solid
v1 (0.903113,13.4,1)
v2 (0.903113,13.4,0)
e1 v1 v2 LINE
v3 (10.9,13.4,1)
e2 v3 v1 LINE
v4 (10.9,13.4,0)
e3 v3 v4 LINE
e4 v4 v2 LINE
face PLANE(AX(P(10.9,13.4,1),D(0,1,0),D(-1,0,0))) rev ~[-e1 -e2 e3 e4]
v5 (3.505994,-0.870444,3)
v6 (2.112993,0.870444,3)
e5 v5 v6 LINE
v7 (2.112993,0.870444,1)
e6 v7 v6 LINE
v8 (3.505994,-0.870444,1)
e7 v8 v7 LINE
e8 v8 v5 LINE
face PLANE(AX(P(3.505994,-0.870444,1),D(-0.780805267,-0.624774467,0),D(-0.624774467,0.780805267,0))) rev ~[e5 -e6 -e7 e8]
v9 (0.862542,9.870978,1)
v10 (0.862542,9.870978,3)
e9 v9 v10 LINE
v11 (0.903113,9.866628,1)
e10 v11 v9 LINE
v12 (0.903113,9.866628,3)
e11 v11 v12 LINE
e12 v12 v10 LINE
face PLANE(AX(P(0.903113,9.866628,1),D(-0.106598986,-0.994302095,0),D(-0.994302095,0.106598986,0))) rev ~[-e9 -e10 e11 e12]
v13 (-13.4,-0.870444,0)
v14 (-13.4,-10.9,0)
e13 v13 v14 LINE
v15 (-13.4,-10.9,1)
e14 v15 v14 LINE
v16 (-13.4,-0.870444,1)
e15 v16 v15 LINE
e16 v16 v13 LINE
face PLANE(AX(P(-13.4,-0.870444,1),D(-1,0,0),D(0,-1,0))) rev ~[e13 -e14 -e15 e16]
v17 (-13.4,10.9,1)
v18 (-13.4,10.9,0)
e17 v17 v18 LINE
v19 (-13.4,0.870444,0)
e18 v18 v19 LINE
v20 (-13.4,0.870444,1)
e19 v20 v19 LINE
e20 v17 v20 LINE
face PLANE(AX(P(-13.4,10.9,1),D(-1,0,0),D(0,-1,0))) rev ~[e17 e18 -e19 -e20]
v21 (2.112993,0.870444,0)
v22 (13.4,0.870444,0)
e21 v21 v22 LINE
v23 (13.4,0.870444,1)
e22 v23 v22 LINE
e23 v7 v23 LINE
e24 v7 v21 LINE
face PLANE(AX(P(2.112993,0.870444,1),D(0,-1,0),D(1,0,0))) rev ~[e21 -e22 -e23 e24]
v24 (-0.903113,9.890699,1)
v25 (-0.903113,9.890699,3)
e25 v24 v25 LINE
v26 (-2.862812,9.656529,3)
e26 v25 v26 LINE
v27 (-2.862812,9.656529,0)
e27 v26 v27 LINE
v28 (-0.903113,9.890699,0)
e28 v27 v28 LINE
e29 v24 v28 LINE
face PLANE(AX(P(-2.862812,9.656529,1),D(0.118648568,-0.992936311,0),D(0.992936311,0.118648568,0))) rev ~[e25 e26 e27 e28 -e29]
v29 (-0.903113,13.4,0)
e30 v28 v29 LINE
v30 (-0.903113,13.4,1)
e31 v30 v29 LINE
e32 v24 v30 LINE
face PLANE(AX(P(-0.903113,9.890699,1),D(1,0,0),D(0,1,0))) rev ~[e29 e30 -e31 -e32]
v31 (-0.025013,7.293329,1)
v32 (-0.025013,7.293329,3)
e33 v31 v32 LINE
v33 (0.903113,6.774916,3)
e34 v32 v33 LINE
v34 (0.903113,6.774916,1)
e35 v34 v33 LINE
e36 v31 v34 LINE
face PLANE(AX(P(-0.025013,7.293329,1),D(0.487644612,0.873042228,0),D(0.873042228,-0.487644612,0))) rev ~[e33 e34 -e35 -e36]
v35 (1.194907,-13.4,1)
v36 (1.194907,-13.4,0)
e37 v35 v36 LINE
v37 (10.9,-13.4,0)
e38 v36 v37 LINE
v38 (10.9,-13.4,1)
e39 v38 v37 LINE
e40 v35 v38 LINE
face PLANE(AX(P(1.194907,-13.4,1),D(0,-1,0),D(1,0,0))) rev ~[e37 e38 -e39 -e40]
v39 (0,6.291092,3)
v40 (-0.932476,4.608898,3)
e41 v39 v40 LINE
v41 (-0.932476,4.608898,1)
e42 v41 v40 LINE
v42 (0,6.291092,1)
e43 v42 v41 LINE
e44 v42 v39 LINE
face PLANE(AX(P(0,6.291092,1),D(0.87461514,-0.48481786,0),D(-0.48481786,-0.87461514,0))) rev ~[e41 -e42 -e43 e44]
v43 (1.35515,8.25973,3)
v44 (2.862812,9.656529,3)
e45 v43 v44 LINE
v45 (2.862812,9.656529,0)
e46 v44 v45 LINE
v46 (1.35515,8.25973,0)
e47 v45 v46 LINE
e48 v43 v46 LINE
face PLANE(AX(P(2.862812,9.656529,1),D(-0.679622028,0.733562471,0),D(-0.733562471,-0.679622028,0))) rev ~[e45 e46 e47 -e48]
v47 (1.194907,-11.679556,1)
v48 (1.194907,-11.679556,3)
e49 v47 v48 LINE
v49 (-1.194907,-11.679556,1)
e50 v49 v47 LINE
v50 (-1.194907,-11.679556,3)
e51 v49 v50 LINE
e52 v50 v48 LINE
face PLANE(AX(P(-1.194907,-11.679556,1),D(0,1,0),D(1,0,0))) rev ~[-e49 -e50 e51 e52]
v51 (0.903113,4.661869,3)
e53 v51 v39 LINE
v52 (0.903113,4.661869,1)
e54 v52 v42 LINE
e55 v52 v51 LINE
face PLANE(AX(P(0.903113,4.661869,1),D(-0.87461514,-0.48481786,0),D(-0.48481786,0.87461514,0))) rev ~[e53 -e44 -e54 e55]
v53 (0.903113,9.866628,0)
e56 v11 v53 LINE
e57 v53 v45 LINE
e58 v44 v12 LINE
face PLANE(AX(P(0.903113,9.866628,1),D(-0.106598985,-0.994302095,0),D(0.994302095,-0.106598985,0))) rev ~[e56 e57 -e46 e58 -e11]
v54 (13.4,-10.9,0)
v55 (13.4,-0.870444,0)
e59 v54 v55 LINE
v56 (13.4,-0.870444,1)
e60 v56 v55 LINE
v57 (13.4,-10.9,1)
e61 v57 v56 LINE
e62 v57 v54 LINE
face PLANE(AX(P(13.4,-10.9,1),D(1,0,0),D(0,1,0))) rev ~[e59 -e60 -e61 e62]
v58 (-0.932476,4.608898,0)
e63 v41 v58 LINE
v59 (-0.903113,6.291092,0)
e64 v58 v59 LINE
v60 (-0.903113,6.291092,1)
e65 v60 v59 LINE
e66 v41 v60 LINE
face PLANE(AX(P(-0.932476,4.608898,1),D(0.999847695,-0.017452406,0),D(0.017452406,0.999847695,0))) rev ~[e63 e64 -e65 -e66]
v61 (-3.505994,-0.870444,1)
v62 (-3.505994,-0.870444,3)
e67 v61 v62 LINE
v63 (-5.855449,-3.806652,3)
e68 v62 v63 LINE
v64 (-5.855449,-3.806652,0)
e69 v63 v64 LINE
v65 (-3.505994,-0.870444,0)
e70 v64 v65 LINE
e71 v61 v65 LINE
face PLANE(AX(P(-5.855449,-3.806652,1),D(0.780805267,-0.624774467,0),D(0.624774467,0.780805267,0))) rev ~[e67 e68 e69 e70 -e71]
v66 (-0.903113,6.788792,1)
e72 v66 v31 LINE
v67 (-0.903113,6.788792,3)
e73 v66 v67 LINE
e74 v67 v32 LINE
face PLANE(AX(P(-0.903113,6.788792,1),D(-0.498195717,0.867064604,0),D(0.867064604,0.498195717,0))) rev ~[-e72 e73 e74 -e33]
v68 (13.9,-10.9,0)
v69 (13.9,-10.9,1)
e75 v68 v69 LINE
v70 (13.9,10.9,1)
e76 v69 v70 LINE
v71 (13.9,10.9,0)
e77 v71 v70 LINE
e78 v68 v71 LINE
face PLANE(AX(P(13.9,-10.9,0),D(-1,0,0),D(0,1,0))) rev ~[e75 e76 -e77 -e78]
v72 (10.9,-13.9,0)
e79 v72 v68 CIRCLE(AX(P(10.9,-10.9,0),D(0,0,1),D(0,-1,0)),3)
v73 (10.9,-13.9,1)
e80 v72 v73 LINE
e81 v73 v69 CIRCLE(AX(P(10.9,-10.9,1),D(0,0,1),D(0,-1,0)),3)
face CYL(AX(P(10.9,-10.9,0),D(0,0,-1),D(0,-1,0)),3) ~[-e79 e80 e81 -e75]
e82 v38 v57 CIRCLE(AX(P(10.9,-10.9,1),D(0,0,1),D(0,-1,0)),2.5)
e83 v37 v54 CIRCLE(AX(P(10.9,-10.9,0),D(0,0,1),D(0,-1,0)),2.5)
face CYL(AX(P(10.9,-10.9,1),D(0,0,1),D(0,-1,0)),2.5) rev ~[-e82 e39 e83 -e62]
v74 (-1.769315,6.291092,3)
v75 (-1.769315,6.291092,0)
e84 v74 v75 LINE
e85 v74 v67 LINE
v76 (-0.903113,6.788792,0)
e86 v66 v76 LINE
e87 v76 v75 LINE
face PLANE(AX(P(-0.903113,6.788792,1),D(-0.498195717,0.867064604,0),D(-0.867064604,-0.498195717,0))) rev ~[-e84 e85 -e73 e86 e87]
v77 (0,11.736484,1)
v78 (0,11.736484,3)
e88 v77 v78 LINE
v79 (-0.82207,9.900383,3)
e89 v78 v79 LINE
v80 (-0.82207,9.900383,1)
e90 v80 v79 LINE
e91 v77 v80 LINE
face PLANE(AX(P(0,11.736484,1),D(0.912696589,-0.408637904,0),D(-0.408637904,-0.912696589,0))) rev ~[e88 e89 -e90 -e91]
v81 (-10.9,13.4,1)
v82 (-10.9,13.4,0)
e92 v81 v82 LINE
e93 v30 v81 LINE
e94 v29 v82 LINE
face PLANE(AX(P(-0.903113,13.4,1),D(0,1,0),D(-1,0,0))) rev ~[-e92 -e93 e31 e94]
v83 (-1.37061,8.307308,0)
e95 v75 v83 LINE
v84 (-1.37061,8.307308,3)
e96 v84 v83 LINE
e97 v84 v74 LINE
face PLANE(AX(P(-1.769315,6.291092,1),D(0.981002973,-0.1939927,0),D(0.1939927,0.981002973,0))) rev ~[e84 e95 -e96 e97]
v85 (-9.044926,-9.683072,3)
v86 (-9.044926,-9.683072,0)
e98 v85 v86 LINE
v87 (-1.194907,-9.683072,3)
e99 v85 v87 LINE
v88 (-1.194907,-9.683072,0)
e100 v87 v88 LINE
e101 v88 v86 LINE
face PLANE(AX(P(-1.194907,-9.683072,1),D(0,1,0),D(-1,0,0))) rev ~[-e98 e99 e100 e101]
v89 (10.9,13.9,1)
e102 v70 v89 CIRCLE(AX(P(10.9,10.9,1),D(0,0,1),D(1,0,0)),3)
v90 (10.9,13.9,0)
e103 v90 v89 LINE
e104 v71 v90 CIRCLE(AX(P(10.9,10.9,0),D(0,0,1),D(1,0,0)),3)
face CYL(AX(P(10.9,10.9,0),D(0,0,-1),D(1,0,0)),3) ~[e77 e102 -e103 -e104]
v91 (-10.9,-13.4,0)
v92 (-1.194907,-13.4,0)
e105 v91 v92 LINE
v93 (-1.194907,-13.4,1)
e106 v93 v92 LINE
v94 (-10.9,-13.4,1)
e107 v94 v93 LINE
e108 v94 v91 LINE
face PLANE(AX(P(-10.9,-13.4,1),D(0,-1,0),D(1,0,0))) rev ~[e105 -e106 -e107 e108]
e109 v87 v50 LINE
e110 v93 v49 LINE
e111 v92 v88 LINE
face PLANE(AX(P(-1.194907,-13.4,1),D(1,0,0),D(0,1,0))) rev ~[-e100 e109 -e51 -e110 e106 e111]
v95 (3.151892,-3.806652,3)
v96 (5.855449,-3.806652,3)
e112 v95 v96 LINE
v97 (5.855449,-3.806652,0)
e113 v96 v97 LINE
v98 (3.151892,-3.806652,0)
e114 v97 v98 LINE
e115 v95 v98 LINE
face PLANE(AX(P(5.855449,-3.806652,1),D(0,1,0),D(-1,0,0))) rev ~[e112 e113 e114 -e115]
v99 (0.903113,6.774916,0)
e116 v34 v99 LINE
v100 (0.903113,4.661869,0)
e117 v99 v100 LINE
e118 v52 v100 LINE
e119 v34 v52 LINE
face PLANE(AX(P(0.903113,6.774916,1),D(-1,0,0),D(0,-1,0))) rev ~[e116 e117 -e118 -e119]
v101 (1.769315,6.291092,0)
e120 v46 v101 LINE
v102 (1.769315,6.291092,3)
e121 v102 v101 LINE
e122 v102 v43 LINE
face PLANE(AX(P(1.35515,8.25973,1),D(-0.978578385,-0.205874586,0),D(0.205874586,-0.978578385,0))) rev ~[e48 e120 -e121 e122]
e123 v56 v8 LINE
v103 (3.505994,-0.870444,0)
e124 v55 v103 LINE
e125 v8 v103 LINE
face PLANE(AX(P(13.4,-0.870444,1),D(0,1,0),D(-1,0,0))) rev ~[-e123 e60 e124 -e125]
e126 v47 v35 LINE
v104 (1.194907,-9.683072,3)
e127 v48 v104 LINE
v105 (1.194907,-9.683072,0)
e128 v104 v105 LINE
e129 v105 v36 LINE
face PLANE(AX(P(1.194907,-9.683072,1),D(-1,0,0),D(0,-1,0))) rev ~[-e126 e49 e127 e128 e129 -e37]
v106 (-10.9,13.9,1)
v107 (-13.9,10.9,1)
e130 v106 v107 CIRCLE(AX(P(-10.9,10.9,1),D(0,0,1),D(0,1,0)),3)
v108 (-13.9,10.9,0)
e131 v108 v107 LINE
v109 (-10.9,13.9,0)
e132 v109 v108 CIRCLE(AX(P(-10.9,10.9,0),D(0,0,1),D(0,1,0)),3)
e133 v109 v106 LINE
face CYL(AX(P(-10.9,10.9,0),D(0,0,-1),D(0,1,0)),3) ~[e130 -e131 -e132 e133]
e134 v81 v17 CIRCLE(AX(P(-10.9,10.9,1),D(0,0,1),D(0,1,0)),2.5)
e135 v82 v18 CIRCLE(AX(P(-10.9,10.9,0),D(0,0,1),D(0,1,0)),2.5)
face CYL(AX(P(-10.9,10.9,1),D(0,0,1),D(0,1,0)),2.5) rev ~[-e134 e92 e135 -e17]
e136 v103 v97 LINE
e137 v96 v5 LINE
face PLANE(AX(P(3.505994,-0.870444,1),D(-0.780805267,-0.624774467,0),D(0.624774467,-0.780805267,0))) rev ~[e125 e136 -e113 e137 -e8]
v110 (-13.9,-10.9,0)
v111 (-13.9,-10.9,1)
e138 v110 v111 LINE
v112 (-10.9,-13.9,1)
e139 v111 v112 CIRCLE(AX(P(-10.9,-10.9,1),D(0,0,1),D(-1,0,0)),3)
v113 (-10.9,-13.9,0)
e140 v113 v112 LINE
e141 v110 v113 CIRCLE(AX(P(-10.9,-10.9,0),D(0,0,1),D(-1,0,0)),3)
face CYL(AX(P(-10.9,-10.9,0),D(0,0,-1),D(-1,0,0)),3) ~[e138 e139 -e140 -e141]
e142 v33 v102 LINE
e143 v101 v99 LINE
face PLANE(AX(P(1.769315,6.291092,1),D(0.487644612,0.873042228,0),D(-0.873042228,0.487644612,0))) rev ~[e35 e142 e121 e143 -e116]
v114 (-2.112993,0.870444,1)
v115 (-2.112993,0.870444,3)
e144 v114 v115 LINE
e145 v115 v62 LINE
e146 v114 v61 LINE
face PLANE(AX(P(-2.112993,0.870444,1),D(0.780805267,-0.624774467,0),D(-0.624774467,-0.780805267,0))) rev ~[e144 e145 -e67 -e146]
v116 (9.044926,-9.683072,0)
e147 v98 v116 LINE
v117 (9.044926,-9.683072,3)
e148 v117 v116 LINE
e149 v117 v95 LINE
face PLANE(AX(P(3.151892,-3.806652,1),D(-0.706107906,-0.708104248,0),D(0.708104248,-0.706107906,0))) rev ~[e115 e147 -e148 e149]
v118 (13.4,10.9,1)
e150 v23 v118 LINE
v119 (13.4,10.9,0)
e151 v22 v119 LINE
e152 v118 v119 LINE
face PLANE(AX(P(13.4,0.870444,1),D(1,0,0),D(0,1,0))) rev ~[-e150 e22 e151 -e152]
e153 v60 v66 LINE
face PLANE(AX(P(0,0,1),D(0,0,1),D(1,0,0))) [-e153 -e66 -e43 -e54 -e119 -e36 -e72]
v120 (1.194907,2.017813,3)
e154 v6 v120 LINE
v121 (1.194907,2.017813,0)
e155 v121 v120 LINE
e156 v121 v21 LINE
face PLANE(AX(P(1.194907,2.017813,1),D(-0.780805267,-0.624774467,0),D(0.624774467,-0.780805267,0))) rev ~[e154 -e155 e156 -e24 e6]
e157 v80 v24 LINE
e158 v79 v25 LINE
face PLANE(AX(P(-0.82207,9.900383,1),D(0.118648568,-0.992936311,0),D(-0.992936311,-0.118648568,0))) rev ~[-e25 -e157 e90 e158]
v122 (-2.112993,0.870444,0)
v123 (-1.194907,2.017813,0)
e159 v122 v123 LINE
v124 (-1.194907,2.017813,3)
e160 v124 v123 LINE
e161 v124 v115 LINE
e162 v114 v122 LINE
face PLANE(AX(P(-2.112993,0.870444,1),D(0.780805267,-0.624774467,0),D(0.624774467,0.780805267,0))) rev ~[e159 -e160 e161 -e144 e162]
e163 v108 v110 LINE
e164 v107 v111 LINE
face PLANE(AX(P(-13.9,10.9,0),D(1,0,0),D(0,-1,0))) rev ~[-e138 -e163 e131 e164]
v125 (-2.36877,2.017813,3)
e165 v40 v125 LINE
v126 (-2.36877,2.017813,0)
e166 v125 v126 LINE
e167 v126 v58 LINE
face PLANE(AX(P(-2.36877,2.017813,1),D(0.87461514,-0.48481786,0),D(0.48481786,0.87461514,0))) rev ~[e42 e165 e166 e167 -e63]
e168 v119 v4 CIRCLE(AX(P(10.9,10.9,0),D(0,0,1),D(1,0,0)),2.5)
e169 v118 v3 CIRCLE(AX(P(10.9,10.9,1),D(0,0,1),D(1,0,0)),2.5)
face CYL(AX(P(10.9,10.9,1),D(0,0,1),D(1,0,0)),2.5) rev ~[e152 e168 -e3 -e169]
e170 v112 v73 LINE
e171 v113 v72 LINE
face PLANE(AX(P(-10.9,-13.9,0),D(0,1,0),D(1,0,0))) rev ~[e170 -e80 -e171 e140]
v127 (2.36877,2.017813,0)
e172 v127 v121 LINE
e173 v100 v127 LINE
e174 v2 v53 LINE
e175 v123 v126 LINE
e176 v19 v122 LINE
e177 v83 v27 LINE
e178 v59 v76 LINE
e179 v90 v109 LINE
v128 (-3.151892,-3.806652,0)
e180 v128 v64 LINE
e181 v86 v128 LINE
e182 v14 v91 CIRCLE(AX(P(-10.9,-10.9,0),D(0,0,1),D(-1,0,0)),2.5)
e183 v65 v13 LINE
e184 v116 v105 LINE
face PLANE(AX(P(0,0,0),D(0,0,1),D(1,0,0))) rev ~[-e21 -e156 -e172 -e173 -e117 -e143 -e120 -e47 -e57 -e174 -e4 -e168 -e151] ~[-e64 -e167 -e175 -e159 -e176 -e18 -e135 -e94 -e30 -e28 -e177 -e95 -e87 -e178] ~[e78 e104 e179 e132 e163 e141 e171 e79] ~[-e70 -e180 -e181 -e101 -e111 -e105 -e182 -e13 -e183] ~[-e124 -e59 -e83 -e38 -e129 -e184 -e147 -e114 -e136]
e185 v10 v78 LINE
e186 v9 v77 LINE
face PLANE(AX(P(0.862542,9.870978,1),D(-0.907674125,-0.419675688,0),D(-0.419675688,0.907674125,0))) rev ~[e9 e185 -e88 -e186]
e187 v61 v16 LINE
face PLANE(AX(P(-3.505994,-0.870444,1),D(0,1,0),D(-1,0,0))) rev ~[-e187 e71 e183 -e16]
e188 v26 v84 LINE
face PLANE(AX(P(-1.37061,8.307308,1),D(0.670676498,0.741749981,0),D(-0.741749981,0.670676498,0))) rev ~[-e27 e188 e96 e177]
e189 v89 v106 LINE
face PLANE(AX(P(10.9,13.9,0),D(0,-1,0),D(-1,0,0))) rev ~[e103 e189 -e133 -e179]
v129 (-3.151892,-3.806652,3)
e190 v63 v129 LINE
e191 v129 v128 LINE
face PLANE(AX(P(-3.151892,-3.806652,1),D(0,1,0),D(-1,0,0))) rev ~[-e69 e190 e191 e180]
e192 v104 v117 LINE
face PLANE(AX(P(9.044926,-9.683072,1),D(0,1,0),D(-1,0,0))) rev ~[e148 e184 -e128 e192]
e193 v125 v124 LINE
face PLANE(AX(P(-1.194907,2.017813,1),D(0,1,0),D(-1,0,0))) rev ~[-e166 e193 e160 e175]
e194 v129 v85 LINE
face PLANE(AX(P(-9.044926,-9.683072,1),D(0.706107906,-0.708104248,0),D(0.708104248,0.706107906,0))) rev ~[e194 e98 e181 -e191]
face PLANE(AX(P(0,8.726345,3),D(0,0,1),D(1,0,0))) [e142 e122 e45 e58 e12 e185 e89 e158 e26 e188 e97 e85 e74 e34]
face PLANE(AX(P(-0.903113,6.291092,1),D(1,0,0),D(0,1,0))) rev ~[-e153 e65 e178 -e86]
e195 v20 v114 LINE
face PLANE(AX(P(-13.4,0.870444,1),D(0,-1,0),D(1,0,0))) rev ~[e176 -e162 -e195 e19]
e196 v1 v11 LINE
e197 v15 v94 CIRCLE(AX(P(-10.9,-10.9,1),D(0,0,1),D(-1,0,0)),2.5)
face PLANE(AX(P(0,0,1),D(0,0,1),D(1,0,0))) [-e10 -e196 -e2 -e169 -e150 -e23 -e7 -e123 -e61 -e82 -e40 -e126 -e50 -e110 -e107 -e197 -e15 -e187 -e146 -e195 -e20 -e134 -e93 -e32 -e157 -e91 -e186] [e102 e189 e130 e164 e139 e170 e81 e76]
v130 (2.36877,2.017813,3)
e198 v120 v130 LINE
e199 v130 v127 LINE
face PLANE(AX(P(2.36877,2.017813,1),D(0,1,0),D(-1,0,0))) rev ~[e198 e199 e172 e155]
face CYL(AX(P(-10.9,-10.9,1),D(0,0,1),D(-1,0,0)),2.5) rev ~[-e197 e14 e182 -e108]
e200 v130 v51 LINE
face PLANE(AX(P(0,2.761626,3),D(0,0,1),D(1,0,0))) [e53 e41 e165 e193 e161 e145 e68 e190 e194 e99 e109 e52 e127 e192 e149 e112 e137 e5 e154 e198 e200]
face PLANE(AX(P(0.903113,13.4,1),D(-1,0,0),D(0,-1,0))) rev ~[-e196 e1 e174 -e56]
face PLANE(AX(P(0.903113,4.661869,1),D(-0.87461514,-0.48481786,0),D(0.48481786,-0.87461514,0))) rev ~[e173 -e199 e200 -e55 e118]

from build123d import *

# Parameters (mm, degrees)
F1_DEPTH = 1
F3_DEPTH = 2
F4_DEPTH = 25


# Not quite as in the source:
# - a feature names something its author has since deleted; it is built from what else it names


with BuildPart() as f1:
    # F0 (on Top) → F1 (new body)
    with BuildSketch(Plane.XY):
        with BuildLine():
            ThreePointArc((-10.9, 13.9), (-13.0213203436, 13.0213203436), (-13.9, 10.9))
            Line((-13.9, 10.9), (-13.9, -10.9))
            ThreePointArc((-13.9, -10.9), (-13.0213203436, -13.0213203436), (-10.9, -13.9))
            Line((-10.9, -13.9), (10.9, -13.9))
            ThreePointArc((10.9, -13.9), (13.0213203436, -13.0213203436), (13.9, -10.9))
            Line((13.9, -10.9), (13.9, 10.9))
            ThreePointArc((13.9, 10.9), (13.0213203436, 13.0213203436), (10.9, 13.9))
            Line((10.9, 13.9), (-10.9, 13.9))
        make_face()
    extrude(amount=F1_DEPTH)

    # F2 (on face) → F3 (join)
    with BuildSketch(Plane.XY.offset(1)):
        Polygon((-0.8220698815, 9.9003828379), (-0.9031134541, 9.8906987285), (-2.8628115953, 9.6565292491), (-1.3706095432, 8.3073079855), (-1.7693148693, 6.2910923774), (-0.9031134541, 6.7887921262), (-0.0250134015, 7.2933285631), (0.9031134541, 6.7749159991), (1.7693148693, 6.2910923774), (1.3551504109, 8.2597296685), (2.8628115953, 9.6565292491), (0.9031134541, 9.8666282056), (0.8625424153, 9.8709778209), (0, 11.7364836228), align=None)
        Polygon((-1.1949065374, 2.0178125706), (-2.11299252, 0.8704443462), (2.11299252, 0.8704443462), (1.1949065374, 2.0178125706), (2.3687703069, 2.0178125706), (0.9031134541, 4.6618687775), (0, 6.2910923774), (-0.9324762655, 4.6088980406), (-2.3687703069, 2.0178125706), align=None)
        Polygon((3.5059938878, -0.8704443462), (-3.5059938878, -0.8704443462), (-5.8554494827, -3.8066515699), (-3.1518915202, -3.8066515699), (-9.0449256822, -9.6830716357), (-1.1949065374, -9.6830716357), (-1.1949065374, -11.6795562208), (0, -11.6795562208), (1.1949065374, -11.6795562208), (1.1949065374, -9.6830716357), (9.0449256822, -9.6830716357), (3.1518915202, -3.8066515699), (5.8554494827, -3.8066515699), align=None)
        Polygon((2.11299252, 0.8704443462), (-2.11299252, 0.8704443462), (-3.5059938878, -0.8704443462), (3.5059938878, -0.8704443462), align=None)
    extrude(amount=F3_DEPTH)

    # F2 (on face) → F4 (cut)
    with BuildSketch(Plane.XY.offset(1)):
        with BuildLine():
            ThreePointArc((-10.9, 13.4), (-12.667766953, 12.667766953), (-13.4, 10.9))
            Line((-13.4, 10.9), (-13.4, 0.8704443462))
            Line((-13.4, 0.8704443462), (-2.11299252, 0.8704443462))
            Line((-2.11299252, 0.8704443462), (-1.1949065374, 2.0178125706))
            Line((-1.1949065374, 2.0178125706), (-2.3687703069, 2.0178125706))
            Line((-2.3687703069, 2.0178125706), (-0.9324762655, 4.6088980406))
            Line((-0.9324762655, 4.6088980406), (-0.9031134541, 6.2910923774))
            Line((-0.9031134541, 6.2910923774), (-0.9031134541, 6.7887921262))
            Line((-0.9031134541, 6.7887921262), (-1.7693148693, 6.2910923774))
            Line((-1.7693148693, 6.2910923774), (-1.3706095432, 8.3073079855))
            Line((-1.3706095432, 8.3073079855), (-2.8628115953, 9.6565292491))
            Line((-2.8628115953, 9.6565292491), (-0.9031134541, 9.8906987285))
            Line((-0.9031134541, 9.8906987285), (-0.9031134541, 13.4))
            Line((-0.9031134541, 13.4), (-10.9, 13.4))
        make_face()
        with BuildLine():
            Line((1.1949065374, 2.0178125706), (2.11299252, 0.8704443462))
            Line((2.11299252, 0.8704443462), (13.4, 0.8704443462))
            Line((13.4, 0.8704443462), (13.4, 10.9))
            ThreePointArc((13.4, 10.9), (12.667766953, 12.667766953), (10.9, 13.4))
            Line((10.9, 13.4), (0.9031134541, 13.4))
            Line((0.9031134541, 13.4), (0.9031134541, 9.8666282056))
            Line((0.9031134541, 9.8666282056), (2.8628115953, 9.6565292491))
            Line((2.8628115953, 9.6565292491), (1.3551504109, 8.2597296685))
            Line((1.3551504109, 8.2597296685), (1.7693148693, 6.2910923774))
            Line((1.7693148693, 6.2910923774), (0.9031134541, 6.7749159991))
            Line((0.9031134541, 6.7749159991), (0.9031134541, 6.2910923774))
            Line((0.9031134541, 6.2910923774), (0.9031134541, 4.6618687775))
            Line((0.9031134541, 4.6618687775), (2.3687703069, 2.0178125706))
            Line((2.3687703069, 2.0178125706), (1.1949065374, 2.0178125706))
        make_face()
        with BuildLine():
            Line((-3.5059938878, -0.8704443462), (-13.4, -0.8704443462))
            Line((-13.4, -0.8704443462), (-13.4, -10.9))
            ThreePointArc((-13.4, -10.9), (-12.667766953, -12.667766953), (-10.9, -13.4))
            Line((-10.9, -13.4), (-1.1949065374, -13.4))
            Line((-1.1949065374, -13.4), (-1.1949065374, -11.6795562208))
            Line((-1.1949065374, -11.6795562208), (-1.1949065374, -9.6830716357))
            Line((-1.1949065374, -9.6830716357), (-9.0449256822, -9.6830716357))
            Line((-9.0449256822, -9.6830716357), (-3.1518915202, -3.8066515699))
            Line((-3.1518915202, -3.8066515699), (-5.8554494827, -3.8066515699))
            Line((-5.8554494827, -3.8066515699), (-3.5059938878, -0.8704443462))
        make_face()
        with BuildLine():
            Line((13.4, -0.8704443462), (3.5059938878, -0.8704443462))
            Line((3.5059938878, -0.8704443462), (5.8554494827, -3.8066515699))
            Line((5.8554494827, -3.8066515699), (3.1518915202, -3.8066515699))
            Line((3.1518915202, -3.8066515699), (9.0449256822, -9.6830716357))
            Line((9.0449256822, -9.6830716357), (1.1949065374, -9.6830716357))
            Line((1.1949065374, -9.6830716357), (1.1949065374, -11.6795562208))
            Line((1.1949065374, -11.6795562208), (1.1949065374, -13.4))
            Line((1.1949065374, -13.4), (10.9, -13.4))
            ThreePointArc((10.9, -13.4), (12.667766953, -12.667766953), (13.4, -10.9))
            Line((13.4, -10.9), (13.4, -0.8704443462))
        make_face()
    extrude(amount=-F4_DEPTH, mode=Mode.SUBTRACT)


solid = f1.part
